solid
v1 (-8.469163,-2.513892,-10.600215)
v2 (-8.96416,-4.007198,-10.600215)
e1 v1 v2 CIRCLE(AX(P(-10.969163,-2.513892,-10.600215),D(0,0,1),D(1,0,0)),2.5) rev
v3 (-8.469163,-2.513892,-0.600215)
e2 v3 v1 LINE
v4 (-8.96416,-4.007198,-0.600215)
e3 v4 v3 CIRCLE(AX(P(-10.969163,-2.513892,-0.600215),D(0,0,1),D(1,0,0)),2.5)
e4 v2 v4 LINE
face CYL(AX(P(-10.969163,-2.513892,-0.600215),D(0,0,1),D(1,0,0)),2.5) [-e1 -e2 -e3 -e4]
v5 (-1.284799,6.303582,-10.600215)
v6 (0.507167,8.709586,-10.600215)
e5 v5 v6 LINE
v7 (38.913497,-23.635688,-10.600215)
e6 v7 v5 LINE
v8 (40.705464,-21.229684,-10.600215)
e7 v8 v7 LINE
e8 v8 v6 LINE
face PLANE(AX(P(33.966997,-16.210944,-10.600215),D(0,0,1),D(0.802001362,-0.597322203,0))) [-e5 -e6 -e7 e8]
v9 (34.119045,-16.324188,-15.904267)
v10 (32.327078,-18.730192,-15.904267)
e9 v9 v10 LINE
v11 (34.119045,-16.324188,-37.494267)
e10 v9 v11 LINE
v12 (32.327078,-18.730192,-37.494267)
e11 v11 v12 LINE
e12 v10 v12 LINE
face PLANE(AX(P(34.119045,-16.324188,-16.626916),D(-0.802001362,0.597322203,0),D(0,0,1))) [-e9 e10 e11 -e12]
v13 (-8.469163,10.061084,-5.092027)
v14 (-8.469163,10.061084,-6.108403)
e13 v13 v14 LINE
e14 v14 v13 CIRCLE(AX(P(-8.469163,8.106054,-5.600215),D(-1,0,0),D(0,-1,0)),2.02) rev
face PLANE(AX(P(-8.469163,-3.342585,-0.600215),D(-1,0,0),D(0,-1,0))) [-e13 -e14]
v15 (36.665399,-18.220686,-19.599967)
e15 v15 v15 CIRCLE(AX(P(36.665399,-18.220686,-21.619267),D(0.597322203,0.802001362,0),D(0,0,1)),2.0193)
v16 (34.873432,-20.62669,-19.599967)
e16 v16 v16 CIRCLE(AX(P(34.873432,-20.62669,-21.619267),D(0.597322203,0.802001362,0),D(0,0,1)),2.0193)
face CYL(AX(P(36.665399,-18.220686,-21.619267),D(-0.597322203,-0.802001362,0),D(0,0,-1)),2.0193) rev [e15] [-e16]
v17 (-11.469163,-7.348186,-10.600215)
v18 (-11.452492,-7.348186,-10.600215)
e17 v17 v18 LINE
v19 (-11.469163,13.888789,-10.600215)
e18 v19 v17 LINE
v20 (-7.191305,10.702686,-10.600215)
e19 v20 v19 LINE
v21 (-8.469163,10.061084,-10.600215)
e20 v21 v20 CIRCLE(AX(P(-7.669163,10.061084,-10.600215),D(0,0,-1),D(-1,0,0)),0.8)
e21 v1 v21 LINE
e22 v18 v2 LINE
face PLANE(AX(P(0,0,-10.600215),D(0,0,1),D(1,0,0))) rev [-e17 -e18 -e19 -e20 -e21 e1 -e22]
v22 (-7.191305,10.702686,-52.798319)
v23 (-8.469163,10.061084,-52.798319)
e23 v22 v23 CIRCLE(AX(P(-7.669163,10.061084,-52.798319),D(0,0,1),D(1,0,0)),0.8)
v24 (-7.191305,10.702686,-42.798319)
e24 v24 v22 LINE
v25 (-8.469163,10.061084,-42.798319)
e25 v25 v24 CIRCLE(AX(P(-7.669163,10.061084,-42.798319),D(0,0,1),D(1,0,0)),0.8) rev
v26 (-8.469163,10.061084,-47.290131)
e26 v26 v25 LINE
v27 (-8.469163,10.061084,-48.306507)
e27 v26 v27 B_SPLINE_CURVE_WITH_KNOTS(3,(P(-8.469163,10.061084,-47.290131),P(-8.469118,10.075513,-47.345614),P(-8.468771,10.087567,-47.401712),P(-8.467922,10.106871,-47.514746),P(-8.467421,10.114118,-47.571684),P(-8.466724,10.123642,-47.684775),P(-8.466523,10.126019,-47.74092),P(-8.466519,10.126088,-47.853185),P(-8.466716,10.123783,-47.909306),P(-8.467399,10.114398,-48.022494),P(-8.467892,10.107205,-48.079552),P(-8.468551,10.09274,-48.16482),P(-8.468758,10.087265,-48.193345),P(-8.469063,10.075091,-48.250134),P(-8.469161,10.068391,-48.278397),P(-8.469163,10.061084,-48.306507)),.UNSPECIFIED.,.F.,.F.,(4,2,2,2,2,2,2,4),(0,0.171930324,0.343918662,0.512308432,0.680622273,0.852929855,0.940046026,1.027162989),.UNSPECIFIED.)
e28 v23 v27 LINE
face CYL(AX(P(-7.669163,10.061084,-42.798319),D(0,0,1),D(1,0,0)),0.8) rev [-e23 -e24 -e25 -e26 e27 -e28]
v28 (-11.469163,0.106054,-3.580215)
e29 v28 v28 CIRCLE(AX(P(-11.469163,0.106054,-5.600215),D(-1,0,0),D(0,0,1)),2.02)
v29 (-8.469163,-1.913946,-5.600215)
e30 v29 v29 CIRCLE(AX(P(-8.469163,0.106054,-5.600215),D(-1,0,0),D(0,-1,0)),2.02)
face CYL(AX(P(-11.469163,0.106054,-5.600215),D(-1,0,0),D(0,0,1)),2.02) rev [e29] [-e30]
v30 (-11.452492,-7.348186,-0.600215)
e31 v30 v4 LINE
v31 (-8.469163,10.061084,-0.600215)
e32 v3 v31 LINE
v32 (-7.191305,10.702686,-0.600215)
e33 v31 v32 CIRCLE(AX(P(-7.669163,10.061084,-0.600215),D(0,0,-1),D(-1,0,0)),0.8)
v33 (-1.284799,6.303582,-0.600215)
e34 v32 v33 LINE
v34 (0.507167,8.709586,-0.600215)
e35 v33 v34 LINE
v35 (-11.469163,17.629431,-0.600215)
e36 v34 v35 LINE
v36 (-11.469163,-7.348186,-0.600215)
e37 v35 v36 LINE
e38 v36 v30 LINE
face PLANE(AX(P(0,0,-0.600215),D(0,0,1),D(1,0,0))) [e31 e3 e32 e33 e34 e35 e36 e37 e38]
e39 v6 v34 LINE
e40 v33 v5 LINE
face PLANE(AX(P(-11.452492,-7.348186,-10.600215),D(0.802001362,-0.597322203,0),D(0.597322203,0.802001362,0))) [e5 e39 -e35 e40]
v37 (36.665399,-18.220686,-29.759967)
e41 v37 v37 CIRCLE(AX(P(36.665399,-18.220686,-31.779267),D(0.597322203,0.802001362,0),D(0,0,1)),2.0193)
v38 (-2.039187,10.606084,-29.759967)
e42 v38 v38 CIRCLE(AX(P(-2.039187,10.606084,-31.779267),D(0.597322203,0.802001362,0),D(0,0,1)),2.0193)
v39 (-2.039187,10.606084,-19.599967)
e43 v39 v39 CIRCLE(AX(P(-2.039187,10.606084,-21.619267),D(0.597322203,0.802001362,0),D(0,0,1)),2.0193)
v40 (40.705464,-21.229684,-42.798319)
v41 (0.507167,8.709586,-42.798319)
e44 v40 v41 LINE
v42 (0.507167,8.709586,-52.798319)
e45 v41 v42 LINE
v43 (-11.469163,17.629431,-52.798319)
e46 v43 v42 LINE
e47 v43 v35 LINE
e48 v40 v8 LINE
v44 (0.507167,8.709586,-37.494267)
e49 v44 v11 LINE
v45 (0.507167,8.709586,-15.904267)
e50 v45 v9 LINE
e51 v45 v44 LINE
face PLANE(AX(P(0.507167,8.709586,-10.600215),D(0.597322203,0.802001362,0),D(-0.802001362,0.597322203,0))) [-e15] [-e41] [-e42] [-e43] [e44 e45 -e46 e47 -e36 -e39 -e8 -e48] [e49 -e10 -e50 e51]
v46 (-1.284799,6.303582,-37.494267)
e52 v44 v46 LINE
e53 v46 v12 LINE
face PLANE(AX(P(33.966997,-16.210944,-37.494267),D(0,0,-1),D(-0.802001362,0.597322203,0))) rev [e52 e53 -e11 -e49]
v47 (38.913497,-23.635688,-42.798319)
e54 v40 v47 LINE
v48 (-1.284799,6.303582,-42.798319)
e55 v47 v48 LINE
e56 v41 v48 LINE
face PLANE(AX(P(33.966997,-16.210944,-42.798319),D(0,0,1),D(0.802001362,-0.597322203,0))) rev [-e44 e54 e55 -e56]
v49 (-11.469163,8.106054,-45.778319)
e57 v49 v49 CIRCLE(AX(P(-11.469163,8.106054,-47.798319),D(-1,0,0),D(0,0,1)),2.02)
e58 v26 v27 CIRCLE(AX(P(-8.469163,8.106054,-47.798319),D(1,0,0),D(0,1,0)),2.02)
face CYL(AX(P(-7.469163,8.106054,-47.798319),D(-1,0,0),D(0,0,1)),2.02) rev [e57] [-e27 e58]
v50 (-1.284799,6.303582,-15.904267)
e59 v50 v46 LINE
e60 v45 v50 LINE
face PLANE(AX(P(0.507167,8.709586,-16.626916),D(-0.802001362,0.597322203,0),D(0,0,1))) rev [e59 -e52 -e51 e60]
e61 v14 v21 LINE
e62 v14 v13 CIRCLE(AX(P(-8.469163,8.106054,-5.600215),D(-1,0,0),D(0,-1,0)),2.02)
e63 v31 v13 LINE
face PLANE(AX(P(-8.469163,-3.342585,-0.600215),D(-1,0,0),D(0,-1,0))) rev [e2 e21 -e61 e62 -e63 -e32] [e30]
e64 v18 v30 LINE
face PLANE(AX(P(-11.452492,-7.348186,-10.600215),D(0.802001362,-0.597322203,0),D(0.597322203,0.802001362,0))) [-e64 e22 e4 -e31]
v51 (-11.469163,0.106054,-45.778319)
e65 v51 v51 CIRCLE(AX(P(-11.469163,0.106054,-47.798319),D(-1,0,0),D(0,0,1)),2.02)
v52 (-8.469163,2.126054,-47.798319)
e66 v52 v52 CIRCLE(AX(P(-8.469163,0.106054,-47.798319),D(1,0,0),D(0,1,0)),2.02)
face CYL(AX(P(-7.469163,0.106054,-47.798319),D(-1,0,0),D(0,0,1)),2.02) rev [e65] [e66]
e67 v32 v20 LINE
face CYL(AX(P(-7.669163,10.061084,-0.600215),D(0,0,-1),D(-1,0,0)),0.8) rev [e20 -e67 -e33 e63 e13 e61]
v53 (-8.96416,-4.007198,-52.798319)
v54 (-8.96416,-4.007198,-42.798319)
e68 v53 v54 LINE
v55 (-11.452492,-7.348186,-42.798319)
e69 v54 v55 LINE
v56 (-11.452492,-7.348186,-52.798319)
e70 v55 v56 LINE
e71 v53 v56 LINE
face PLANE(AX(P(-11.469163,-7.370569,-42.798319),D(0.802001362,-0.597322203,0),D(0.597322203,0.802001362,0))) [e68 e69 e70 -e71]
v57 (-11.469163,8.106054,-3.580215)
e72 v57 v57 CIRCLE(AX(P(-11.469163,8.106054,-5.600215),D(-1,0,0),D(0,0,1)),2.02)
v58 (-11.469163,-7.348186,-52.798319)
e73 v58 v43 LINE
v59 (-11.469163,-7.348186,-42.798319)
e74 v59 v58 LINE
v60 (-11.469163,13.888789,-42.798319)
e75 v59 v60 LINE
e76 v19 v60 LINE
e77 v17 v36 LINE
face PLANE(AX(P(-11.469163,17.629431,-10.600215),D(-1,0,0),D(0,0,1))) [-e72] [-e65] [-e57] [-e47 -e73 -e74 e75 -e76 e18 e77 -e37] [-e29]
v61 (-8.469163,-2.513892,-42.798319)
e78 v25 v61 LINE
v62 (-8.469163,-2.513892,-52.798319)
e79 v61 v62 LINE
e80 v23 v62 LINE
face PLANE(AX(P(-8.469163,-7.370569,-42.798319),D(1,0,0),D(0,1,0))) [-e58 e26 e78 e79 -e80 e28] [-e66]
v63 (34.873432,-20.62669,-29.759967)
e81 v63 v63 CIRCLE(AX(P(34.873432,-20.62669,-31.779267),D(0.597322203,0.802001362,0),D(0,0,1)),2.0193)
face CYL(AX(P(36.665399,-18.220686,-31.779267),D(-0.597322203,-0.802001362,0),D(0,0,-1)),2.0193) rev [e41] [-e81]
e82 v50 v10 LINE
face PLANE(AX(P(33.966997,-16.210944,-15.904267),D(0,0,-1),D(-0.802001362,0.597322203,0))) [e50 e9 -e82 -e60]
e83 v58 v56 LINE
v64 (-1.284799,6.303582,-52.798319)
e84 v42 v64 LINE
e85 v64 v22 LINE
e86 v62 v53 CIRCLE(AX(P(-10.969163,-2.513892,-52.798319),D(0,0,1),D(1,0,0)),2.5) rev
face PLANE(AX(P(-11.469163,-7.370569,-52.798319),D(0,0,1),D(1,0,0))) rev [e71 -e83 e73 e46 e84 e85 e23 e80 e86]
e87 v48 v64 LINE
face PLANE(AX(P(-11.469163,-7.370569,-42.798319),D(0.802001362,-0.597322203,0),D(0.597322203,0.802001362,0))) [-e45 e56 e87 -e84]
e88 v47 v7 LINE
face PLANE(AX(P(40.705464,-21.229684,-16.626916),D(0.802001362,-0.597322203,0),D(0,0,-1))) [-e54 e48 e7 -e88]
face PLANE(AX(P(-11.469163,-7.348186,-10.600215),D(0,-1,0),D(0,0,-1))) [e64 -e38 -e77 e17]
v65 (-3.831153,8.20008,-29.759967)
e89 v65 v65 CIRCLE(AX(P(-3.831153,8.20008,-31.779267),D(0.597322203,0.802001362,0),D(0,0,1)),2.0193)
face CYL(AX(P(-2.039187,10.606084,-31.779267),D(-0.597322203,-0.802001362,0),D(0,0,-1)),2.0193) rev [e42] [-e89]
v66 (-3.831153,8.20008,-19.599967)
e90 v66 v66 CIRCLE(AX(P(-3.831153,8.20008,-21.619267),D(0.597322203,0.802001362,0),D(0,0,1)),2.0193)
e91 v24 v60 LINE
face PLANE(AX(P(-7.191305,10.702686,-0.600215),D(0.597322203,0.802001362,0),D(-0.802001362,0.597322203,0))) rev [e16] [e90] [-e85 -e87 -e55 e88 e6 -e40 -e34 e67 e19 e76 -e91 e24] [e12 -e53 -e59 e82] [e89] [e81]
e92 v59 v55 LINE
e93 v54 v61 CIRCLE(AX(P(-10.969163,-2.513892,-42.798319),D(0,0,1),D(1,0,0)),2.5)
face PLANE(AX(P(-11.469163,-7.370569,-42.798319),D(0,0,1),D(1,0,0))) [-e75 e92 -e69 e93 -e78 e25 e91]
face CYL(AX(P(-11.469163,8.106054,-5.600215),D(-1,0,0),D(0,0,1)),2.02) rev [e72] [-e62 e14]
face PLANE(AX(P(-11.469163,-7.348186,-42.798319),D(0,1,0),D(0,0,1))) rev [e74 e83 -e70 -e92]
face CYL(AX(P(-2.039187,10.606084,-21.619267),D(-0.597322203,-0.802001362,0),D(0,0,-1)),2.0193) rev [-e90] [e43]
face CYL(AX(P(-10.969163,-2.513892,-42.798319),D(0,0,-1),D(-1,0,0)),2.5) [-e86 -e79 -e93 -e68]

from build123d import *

# Parameters (mm, degrees)
BOSS_EXTRUDE1_DEPTH        = 10
CUT_EXTRUDE1_DEPTH         = 24.288163202
M3_5_CLEARANCE_HOLE1_D     = 4.04
M3_5_CLEARANCE_HOLE1_DEPTH = 11.976330523
M3_5_CLEARANCE_HOLE2_D     = 4.04
M3_5_CLEARANCE_HOLE2_DEPTH = 3
FILLET1_R                  = 2.5
COMBINE1_START             = -42.798318907
COMBINE1_DEPTH             = 32.198103497
COMBINE1_START_2           = -52.798318907
COMBINE1_2_DEPTH           = 10
COMBINE1_3_DEPTH           = 5.304051749
COMBINE1_START_3           = -15.904267158
COMBINE1_4_DEPTH           = 5.304051748


with BuildPart() as part:
    # Sketch1 → Boss-Extrude1 (new body)
    with BuildSketch(Plane.XY.offset(-0.60021541)):
        Polygon((-11.469163068, -7.348185616), (-11.452492295, -7.348185616), (0.507167456, 8.709585816), (-11.469163068, 17.629431184), align=None)
    extrude(amount=-BOSS_EXTRUDE1_DEPTH)

    # Sketch2 → Cut-Extrude1 (cut, through all)
    with BuildSketch(Plane(origin=(0, 0, -10.60021541), x_dir=(-1, 0, 0), z_dir=(0, 0, -1))):
        with BuildLine():
            Line((8.469163068, -3.342585136), (8.469163068, 10.061084473))
            ThreePointArc((8.469163068, 10.061084473), (8.028129493, 10.776027202), (7.191305305, 10.702685563))
            Line((7.191305305, 10.702685563), (1.284799154, 6.303581729))
            Line((1.284799154, 6.303581729), (8.469163068, -3.342585136))
        make_face()
    extrude(amount=-CUT_EXTRUDE1_DEPTH, mode=Mode.SUBTRACT)

    # M3.5 Clearance Hole1
    with Locations(Plane.ZY.offset(11.469163068)):
        with Locations((-5.60021541, 0.106053799)):
            Hole(M3_5_CLEARANCE_HOLE1_D / 2, depth=M3_5_CLEARANCE_HOLE1_DEPTH)

    # M3.5 Clearance Hole2
    with Locations(Plane.ZY.offset(11.469163068)):
        with Locations((-5.60021541, 8.106053799)):
            Hole(M3_5_CLEARANCE_HOLE2_D / 2, depth=M3_5_CLEARANCE_HOLE2_DEPTH)

    # Fillet1
    fillet1_edges = [part.edges().sort_by_distance(p)[0] for p in [
        (-8.469163068, -3.342585136, -5.60021541),
    ]]
    fillet(fillet1_edges, radius=FILLET1_R)

    # Combine1: read off the stored shape, not the designer's step
    # Combine1 outline → Combine1 (add)
    with BuildSketch(Plane.XY.offset(COMBINE1_START)):
        Polygon((-1.284799143, 6.30358172), (0.507167468, 8.709585807), (-11.469163068, 17.629431184), (-11.469163068, 13.888789159), align=None)
        Polygon((40.70546383, -21.229683728), (34.119044566, -16.324187738), (32.327077956, -18.730191825), (38.913497219, -23.635687815), align=None)
    extrude(amount=COMBINE1_DEPTH)

    # Combine1 2 outline → Combine1 2 (add)
    with BuildSketch(Plane.XY.offset(COMBINE1_START_2)):
        with BuildLine():
            Line((-1.284799143, 6.30358172), (0.507167468, 8.709585807))
            Line((0.507167468, 8.709585807), (-11.469163068, 17.629431184))
            Line((-11.469163068, 17.629431184), (-11.469163068, -7.348185616))
            Line((-11.469163068, -7.348185616), (-11.452492295, -7.348185616))
            Line((-11.452492295, -7.348185616), (-8.964159662, -4.00719787))
            ThreePointArc((-8.964159662, -4.00719787), (-8.596136676, -3.300496292), (-8.469163068, -2.513892362))
            Line((-8.469163068, -2.513892362), (-8.469163068, 10.061084473))
            ThreePointArc((-8.469163068, 10.061084473), (-8.028129494, 10.776027202), (-7.191305305, 10.702685563))
            Line((-7.191305305, 10.702685563), (-1.284799143, 6.30358172))
        make_face()
    extrude(amount=COMBINE1_2_DEPTH)

    # Combine1 3 outline → Combine1 3 (add)
    with BuildSketch(Plane.XY.offset(COMBINE1_START)):
        Polygon((34.119044566, -16.324187738), (0.507167462, 8.709585812), (-1.284799143, 6.30358172), (32.327077956, -18.730191825), align=None)
    extrude(amount=COMBINE1_3_DEPTH)

    # Combine1 4 outline → Combine1 4 (add)
    with BuildSketch(Plane.XY.offset(COMBINE1_START_3)):
        Polygon((34.119044566, -16.324187738), (0.507167462, 8.709585812), (-1.284799143, 6.30358172), (32.327077956, -18.730191825), align=None)
    extrude(amount=COMBINE1_4_DEPTH)

    # Combine1 5: loft between two sections, ruled curve by curve
    combine1_5_from = [
        Edge.make_three_point_arc((36.665398892, -18.220685734, -29.759967158), (35.045917541, -17.014513008, -31.779267158), (36.665398892, -18.220685734, -33.798567158)),
        Edge.make_three_point_arc((36.665398892, -18.220685734, -33.798567158), (38.284880243, -19.426858459, -31.779267158), (36.665398892, -18.220685734, -29.759967158)),
    ]
    combine1_5_to = [
        Edge.make_three_point_arc((34.873432281, -20.626689821, -29.759967158), (33.25395093, -19.420517096, -31.779267158), (34.873432281, -20.626689821, -33.798567158)),
        Edge.make_three_point_arc((34.873432281, -20.626689821, -33.798567158), (36.492913632, -21.832862546, -31.779267158), (34.873432281, -20.626689821, -29.759967158)),
    ]
    combine1_5 = Solid(Shell([*[Face.make_surface_from_curves(combine1_5_from[k], combine1_5_to[k]) for k in range(2)], Face(Wire(combine1_5_from)), Face(Wire(combine1_5_to))]))
    add(combine1_5, mode=Mode.SUBTRACT)

    # Combine1 6: loft between two sections, ruled curve by curve
    combine1_6_from = [
        Edge.make_three_point_arc((36.665398892, -18.220685734, -19.599967158), (35.045917541, -17.014513008, -21.619267158), (36.665398892, -18.220685734, -23.638567158)),
        Edge.make_three_point_arc((36.665398892, -18.220685734, -23.638567158), (38.284880243, -19.426858459, -21.619267158), (36.665398892, -18.220685734, -19.599967158)),
    ]
    combine1_6_to = [
        Edge.make_three_point_arc((34.873432281, -20.626689821, -19.599967158), (33.25395093, -19.420517096, -21.619267158), (34.873432281, -20.626689821, -23.638567158)),
        Edge.make_three_point_arc((34.873432281, -20.626689821, -23.638567158), (36.492913632, -21.832862546, -21.619267158), (34.873432281, -20.626689821, -19.599967158)),
    ]
    combine1_6 = Solid(Shell([*[Face.make_surface_from_curves(combine1_6_from[k], combine1_6_to[k]) for k in range(2)], Face(Wire(combine1_6_from)), Face(Wire(combine1_6_to))]))
    add(combine1_6, mode=Mode.SUBTRACT)

    # Combine1 7: loft between two sections, ruled curve by curve
    combine1_7_from = [
        Edge.make_three_point_arc((-2.039186858, 10.606083803, -29.759967158), (-3.658668209, 11.812256529, -31.779267158), (-2.039186858, 10.606083803, -33.798567158)),
        Edge.make_three_point_arc((-2.039186858, 10.606083803, -33.798567158), (-0.419705507, 9.399911078, -31.779267158), (-2.039186858, 10.606083803, -29.759967158)),
    ]
    combine1_7_to = [
        Edge.make_three_point_arc((-3.831153468, 8.200079716, -29.759967158), (-5.45063482, 9.406252441, -31.779267158), (-3.831153468, 8.200079716, -33.798567158)),
        Edge.make_three_point_arc((-3.831153468, 8.200079716, -33.798567158), (-2.211672117, 6.993906991, -31.779267158), (-3.831153468, 8.200079716, -29.759967158)),
    ]
    combine1_7 = Solid(Shell([*[Face.make_surface_from_curves(combine1_7_from[k], combine1_7_to[k]) for k in range(2)], Face(Wire(combine1_7_from)), Face(Wire(combine1_7_to))]))
    add(combine1_7, mode=Mode.SUBTRACT)

    # Combine1 8: loft between two sections, ruled curve by curve
    combine1_8_from = [
        Edge.make_three_point_arc((-2.039186858, 10.606083803, -19.599967158), (-3.658668209, 11.812256529, -21.619267158), (-2.039186858, 10.606083803, -23.638567158)),
        Edge.make_three_point_arc((-2.039186858, 10.606083803, -23.638567158), (-0.419705507, 9.399911078, -21.619267158), (-2.039186858, 10.606083803, -19.599967158)),
    ]
    combine1_8_to = [
        Edge.make_three_point_arc((-3.831153468, 8.200079716, -19.599967158), (-5.45063482, 9.406252441, -21.619267158), (-3.831153468, 8.200079716, -23.638567158)),
        Edge.make_three_point_arc((-3.831153468, 8.200079716, -23.638567158), (-2.211672117, 6.993906991, -21.619267158), (-3.831153468, 8.200079716, -19.599967158)),
    ]
    combine1_8 = Solid(Shell([*[Face.make_surface_from_curves(combine1_8_from[k], combine1_8_to[k]) for k in range(2)], Face(Wire(combine1_8_from)), Face(Wire(combine1_8_to))]))
    add(combine1_8, mode=Mode.SUBTRACT)

    # Combine1 9: loft between two sections, ruled curve by curve
    combine1_9_from = [
        Edge.make_three_point_arc((-8.466516755, 8.106053799, -45.778318907), (-8.466516755, 10.126053799, -47.798318907), (-8.466516755, 8.106053799, -49.818318907)),
        Edge.make_three_point_arc((-8.466516755, 8.106053799, -49.818318907), (-8.466516755, 6.086053799, -47.798318907), (-8.466516755, 8.106053799, -45.778318907)),
    ]
    combine1_9_to = [
        Edge.make_three_point_arc((-11.469163068, 8.106053799, -45.778318907), (-11.469163068, 10.126053799, -47.798318907), (-11.469163068, 8.106053799, -49.818318907)),
        Edge.make_three_point_arc((-11.469163068, 8.106053799, -49.818318907), (-11.469163068, 6.086053799, -47.798318907), (-11.469163068, 8.106053799, -45.778318907)),
    ]
    combine1_9 = Solid(Shell([*[Face.make_surface_from_curves(combine1_9_from[k], combine1_9_to[k]) for k in range(2)], Face(Wire(combine1_9_from)), Face(Wire(combine1_9_to))]))
    add(combine1_9, mode=Mode.SUBTRACT)

    # Combine1 10: loft between two sections, ruled curve by curve
    combine1_10_from = [
        Edge.make_three_point_arc((-8.469163068, 0.106053799, -45.778318907), (-8.469163068, 2.126053799, -47.798318907), (-8.469163068, 0.106053799, -49.818318907)),
        Edge.make_three_point_arc((-8.469163068, 0.106053799, -49.818318907), (-8.469163068, -1.913946201, -47.798318907), (-8.469163068, 0.106053799, -45.778318907)),
    ]
    combine1_10_to = [
        Edge.make_three_point_arc((-11.469163068, 0.106053799, -45.778318907), (-11.469163068, 2.126053799, -47.798318907), (-11.469163068, 0.106053799, -49.818318907)),
        Edge.make_three_point_arc((-11.469163068, 0.106053799, -49.818318907), (-11.469163068, -1.913946201, -47.798318907), (-11.469163068, 0.106053799, -45.778318907)),
    ]
    combine1_10 = Solid(Shell([*[Face.make_surface_from_curves(combine1_10_from[k], combine1_10_to[k]) for k in range(2)], Face(Wire(combine1_10_from)), Face(Wire(combine1_10_to))]))
    add(combine1_10, mode=Mode.SUBTRACT)


solid = part.part
